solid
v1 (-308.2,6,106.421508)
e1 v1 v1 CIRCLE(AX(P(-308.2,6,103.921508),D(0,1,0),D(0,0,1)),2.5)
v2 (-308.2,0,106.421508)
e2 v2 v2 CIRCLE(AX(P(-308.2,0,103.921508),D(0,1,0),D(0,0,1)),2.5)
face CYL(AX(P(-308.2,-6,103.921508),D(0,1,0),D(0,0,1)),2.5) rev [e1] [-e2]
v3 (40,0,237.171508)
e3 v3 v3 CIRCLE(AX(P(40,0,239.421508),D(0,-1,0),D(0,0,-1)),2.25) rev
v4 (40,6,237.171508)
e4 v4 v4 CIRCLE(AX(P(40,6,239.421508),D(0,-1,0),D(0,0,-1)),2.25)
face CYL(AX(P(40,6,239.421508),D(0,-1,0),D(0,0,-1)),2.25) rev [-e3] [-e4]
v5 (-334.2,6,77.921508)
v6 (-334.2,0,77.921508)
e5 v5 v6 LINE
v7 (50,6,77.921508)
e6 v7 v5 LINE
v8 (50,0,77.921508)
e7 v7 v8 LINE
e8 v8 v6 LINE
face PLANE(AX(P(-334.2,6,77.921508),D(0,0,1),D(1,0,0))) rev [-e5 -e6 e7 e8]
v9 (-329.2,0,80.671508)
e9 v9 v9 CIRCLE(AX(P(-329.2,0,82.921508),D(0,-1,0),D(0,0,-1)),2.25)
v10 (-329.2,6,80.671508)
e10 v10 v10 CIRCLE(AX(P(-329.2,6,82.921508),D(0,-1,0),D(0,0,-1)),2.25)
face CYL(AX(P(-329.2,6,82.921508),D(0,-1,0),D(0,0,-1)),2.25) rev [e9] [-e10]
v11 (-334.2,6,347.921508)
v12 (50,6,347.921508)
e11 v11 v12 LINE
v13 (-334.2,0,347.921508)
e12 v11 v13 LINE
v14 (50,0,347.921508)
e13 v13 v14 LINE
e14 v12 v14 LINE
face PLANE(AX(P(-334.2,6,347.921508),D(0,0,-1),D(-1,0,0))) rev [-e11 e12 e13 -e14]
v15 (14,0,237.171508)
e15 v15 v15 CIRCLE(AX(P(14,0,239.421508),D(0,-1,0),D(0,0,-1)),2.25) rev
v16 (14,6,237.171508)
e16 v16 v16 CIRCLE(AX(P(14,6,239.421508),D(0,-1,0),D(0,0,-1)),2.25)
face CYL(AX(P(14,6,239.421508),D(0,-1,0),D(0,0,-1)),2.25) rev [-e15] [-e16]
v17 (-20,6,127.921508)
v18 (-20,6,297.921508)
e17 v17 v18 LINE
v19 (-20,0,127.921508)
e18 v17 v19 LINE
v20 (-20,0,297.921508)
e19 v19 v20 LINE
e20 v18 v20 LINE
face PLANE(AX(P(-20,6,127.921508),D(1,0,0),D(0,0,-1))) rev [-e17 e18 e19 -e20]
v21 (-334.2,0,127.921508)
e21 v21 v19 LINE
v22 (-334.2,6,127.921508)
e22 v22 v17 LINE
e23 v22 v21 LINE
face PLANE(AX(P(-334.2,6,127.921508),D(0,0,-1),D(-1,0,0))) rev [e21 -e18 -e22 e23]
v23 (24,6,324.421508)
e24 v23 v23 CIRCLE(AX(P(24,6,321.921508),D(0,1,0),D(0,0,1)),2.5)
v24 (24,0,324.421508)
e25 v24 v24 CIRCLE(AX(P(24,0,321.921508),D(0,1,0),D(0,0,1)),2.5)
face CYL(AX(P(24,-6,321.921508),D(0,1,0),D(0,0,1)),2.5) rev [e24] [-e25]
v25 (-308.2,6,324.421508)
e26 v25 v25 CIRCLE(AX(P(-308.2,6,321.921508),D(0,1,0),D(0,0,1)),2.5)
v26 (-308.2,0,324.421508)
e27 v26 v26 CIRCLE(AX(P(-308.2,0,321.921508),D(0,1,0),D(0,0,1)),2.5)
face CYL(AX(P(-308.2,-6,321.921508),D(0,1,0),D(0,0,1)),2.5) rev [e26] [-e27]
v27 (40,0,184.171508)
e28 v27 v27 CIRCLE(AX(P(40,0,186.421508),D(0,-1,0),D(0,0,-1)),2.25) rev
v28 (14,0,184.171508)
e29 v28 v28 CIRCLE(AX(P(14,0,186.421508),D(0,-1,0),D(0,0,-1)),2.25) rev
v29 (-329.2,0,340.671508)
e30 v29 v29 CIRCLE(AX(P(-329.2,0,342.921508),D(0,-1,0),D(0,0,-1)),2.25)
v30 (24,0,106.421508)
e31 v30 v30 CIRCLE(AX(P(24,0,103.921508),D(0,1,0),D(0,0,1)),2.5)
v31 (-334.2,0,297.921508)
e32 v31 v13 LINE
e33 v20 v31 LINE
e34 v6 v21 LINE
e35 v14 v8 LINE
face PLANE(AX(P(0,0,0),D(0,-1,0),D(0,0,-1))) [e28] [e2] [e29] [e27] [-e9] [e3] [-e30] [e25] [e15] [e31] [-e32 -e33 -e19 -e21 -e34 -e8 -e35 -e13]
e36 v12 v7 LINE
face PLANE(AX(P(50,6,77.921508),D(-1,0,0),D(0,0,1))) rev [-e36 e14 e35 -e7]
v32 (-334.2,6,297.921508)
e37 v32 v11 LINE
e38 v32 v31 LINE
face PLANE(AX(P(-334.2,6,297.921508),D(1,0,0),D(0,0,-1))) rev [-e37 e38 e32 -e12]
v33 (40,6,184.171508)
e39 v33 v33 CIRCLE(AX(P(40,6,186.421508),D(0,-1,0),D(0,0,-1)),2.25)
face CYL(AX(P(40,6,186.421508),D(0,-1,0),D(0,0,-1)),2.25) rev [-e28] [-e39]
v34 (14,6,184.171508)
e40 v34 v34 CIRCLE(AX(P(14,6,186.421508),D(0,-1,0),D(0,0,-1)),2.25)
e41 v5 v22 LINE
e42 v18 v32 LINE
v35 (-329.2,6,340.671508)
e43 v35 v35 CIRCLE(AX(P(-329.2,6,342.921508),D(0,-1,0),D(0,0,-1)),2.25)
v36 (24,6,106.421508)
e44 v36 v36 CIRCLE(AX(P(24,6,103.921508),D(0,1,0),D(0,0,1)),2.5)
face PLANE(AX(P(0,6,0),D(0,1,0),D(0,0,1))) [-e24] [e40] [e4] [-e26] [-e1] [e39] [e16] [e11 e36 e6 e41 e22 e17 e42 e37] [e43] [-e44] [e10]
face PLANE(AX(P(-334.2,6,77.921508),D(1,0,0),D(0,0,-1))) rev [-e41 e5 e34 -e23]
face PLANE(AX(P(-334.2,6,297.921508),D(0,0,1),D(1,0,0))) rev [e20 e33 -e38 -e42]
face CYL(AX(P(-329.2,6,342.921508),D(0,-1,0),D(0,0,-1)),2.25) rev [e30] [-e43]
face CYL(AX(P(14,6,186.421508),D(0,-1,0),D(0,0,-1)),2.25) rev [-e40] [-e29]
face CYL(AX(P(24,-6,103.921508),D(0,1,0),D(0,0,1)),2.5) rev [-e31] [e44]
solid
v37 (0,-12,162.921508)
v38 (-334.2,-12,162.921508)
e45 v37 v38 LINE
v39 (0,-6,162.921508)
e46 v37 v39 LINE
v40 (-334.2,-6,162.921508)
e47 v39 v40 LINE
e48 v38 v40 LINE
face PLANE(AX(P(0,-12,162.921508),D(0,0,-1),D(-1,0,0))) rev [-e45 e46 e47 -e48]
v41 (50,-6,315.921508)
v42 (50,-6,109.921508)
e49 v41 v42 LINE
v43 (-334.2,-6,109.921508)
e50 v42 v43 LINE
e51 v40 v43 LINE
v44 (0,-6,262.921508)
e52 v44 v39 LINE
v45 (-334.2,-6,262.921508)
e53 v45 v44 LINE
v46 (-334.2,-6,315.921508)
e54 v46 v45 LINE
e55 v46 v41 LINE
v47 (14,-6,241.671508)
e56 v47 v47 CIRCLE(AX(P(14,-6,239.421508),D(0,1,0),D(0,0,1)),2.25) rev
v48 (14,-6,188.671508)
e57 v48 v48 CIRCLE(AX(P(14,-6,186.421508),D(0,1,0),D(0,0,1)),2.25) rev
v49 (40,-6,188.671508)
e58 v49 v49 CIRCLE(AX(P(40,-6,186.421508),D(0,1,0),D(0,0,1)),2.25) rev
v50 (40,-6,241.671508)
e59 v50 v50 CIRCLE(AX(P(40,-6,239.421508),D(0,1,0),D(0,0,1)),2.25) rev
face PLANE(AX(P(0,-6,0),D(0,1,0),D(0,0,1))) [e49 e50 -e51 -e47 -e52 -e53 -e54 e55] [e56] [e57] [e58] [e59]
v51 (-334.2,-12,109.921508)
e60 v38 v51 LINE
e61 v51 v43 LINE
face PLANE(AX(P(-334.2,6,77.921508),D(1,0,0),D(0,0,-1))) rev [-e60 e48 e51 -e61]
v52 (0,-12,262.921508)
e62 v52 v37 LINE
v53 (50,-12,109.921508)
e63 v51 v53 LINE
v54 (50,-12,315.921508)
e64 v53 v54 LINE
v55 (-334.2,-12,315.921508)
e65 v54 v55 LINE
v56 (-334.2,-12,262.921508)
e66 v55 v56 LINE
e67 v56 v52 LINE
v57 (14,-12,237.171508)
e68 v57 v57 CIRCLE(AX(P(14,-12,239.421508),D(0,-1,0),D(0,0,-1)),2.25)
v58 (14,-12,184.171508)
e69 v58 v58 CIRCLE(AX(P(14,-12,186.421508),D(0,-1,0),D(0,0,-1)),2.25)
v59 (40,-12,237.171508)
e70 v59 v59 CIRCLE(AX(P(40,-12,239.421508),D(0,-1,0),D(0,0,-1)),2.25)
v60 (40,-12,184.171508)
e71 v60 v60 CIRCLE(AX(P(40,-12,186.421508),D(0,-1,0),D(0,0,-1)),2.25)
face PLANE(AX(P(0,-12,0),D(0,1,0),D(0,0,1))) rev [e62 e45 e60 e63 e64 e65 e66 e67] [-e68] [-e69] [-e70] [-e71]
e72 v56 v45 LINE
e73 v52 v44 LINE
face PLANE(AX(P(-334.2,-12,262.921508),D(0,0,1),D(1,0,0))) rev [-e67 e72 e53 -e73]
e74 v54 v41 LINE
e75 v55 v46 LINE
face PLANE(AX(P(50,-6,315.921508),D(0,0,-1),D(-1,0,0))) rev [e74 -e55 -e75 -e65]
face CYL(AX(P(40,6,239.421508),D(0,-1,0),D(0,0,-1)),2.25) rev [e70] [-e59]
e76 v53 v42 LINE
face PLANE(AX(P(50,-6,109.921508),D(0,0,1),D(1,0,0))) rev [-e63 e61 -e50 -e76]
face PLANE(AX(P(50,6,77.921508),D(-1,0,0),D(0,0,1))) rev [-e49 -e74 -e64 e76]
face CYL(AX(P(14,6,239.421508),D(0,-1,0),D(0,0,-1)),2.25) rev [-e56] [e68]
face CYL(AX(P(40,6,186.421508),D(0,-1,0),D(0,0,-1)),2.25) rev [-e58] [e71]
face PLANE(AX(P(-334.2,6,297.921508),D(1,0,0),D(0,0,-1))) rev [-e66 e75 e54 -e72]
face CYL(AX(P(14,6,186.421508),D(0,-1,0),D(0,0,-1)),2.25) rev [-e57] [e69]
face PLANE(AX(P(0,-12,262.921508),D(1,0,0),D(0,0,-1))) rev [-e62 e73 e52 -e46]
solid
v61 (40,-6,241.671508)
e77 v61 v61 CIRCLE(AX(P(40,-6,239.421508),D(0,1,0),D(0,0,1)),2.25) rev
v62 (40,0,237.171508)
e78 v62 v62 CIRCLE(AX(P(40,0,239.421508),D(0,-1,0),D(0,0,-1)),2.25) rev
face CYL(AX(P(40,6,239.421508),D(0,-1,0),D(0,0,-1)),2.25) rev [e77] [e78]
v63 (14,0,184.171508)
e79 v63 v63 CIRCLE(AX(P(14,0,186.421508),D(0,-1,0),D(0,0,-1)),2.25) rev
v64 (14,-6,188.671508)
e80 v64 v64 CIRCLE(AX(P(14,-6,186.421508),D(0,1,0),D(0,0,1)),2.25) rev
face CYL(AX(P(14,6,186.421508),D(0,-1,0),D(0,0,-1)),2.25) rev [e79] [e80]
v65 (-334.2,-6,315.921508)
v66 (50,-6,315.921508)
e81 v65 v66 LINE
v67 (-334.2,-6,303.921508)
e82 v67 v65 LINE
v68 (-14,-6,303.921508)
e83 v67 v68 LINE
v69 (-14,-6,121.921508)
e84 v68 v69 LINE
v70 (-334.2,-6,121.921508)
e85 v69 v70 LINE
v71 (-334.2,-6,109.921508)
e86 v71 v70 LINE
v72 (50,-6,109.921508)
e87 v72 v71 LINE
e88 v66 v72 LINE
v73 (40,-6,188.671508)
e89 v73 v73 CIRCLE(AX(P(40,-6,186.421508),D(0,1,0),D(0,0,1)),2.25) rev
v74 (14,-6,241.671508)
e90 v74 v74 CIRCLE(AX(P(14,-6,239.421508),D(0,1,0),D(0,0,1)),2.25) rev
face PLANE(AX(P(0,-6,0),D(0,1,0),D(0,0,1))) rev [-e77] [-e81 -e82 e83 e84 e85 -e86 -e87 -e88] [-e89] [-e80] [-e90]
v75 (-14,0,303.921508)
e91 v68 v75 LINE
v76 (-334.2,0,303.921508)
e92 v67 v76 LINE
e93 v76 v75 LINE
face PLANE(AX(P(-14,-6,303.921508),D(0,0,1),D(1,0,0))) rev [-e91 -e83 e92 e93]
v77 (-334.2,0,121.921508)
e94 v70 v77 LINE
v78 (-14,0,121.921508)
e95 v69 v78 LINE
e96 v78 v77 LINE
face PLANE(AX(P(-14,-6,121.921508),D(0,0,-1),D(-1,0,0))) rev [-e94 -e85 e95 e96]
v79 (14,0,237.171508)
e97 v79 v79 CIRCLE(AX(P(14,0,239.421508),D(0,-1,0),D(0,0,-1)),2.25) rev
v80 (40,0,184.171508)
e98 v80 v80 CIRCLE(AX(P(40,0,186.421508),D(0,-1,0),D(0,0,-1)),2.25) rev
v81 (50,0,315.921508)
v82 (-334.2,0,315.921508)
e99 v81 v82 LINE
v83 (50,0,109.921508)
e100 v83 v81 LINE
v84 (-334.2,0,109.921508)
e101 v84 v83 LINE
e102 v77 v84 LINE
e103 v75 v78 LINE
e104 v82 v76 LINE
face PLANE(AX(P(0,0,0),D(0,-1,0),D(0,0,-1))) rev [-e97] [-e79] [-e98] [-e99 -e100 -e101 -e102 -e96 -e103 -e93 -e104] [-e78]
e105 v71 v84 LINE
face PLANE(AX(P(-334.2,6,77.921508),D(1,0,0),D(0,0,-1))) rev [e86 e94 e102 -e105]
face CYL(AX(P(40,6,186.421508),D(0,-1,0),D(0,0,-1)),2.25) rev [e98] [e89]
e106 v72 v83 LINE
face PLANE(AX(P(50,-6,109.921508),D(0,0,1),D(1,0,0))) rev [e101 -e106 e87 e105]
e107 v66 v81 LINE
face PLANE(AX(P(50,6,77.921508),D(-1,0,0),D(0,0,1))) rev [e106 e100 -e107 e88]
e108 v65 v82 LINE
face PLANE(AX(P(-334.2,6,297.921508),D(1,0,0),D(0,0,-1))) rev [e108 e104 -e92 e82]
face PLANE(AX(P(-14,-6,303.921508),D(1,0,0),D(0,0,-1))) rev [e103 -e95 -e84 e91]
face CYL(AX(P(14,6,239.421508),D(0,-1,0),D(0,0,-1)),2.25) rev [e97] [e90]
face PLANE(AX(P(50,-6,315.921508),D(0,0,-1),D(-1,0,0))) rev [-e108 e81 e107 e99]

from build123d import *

# Parameters (mm, degrees)
EXTRUDE_2_DEPTH             = 6
EXTRUDE_3_DEPTH             = 6
SKETCH_4_R                  = 2.5
CUT_EXTRUDE_1_DEPTH         = 483.579543495
PATTERN_LINEAR_2_COUNT      = 2
PATTERN_LINEAR_2_PITCH      = 332.2
PATTERN_LINEAR_2_COUNT_DIR2 = 2
PATTERN_LINEAR_2_PITCH_DIR2 = 218
EXTRUDE_4_DEPTH             = 6
SKETCH_6_R                  = 2.25
CUT_EXTRUDE_2_DEPTH         = 483.766005224
SKETCH_7_R                  = 2.25
CUT_EXTRUDE_3_DEPTH         = 483.579543495
SPLIT_START                 = -12
SPLIT_BODIES_1_OUTLINE_R    = 2.25
SPLIT_BODIES_1_DEPTH        = 12
SPLIT_START_2               = -6
SPLIT_BODIES_1_2_OUTLINE_R  = 2.25
SPLIT_BODIES_1_2_DEPTH      = 6
SPLIT_BODIES_1_3_OUTLINE_R  = 2.25
SPLIT_BODIES_1_3_DEPTH      = 6


# Read off the part's stored shape, not the designer's step: Разделить1
with BuildPart() as part:
    # Эскиз1 → Бобышка-Вытянуть2 (new body)
    with BuildSketch(Plane(origin=(0, 0, 0), x_dir=(1, 0, 0), z_dir=(0, 1, 0))):
        Polygon((50, -77.921508101), (50, -347.921508101), (-334.2, -347.921508101), (-334.2, -297.921508101), (-20, -297.921508101), (-20, -127.921508101), (-334.2, -127.921508101), (-334.2, -77.921508101), align=None)
    extrude(amount=EXTRUDE_2_DEPTH)

    # Эскиз2 → Бобышка-Вытянуть3 (add)
    with BuildSketch(Plane.XZ):
        Polygon((50, 315.921508101), (50, 109.921508101), (-334.2, 109.921508101), (-334.2, 121.921508101), (-14, 121.921508101), (-14, 303.921508101), (-334.2, 303.921508101), (-334.2, 315.921508101), align=None)
    extrude(amount=EXTRUDE_3_DEPTH)

    # Эскиз4 → Вырез-Вытянуть1 (cut, through all)
    with BuildSketch(Plane(origin=(0, 6, 0), x_dir=(1, 0, 0), z_dir=(0, 1, 0))):
        with Locations(Location((-308.2, -103.921508101, 0), (0, 0, 270))):
            Circle(SKETCH_4_R)
    cut_extrude_1 = extrude(amount=-CUT_EXTRUDE_1_DEPTH, mode=Mode.SUBTRACT)

    # Линейный массив2: Cut-Extrude 1 2 × 2
    with Locations(*[(i * PATTERN_LINEAR_2_PITCH, 0, j * PATTERN_LINEAR_2_PITCH_DIR2) for i in range(PATTERN_LINEAR_2_COUNT) for j in range(PATTERN_LINEAR_2_COUNT_DIR2) if (i, j) != (0, 0)]):
        add(cut_extrude_1, mode=Mode.SUBTRACT)

    # Эскиз5 → Бобышка-Вытянуть4 (add)
    with BuildSketch(Plane.XZ.offset(6)):
        Polygon((50, 315.921508101), (-334.2, 315.921508101), (-334.2, 262.921508101), (0, 262.921508101), (0, 162.921508101), (-334.2, 162.921508101), (-334.2, 109.921508101), (50, 109.921508101), align=None)
    extrude(amount=EXTRUDE_4_DEPTH)

    # Эскиз6 → Вырез-Вытянуть2 (cut, through all)
    with BuildSketch(Plane.XZ.offset(12)):
        with Locations(Location((14, 239.421508101, 0), (0, 0, 270))):
            Circle(SKETCH_6_R)
        with Locations(Location((40, 239.421508101, 0), (0, 0, 270))):
            Circle(SKETCH_6_R)
        with Locations(Location((40, 186.421508101, 0), (0, 0, 270))):
            Circle(SKETCH_6_R)
        with Locations(Location((14, 186.421508101, 0), (0, 0, 270))):
            Circle(SKETCH_6_R)
    extrude(amount=-CUT_EXTRUDE_2_DEPTH, mode=Mode.SUBTRACT)

    # Эскиз7 → Вырез-Вытянуть3 (cut, through all)
    with BuildSketch(Plane.XZ):
        with Locations(Location((-329.2, 342.921508101, 0), (0, 0, 270))):
            Circle(SKETCH_7_R)
        with Locations(Location((-329.2, 82.921508101, 0), (0, 0, 270))):
            Circle(SKETCH_7_R)
    extrude(amount=-CUT_EXTRUDE_3_DEPTH, mode=Mode.SUBTRACT)

    # Split Bodies 1 outline → Split Bodies 1 (cut)
    with BuildSketch(Plane(origin=(0, 0, 0), x_dir=(1, 0, 0), z_dir=(0, 1, 0)).offset(SPLIT_START)):
        Polygon((-334.2, -162.921508101), (-14, -162.921508101), (-14, -262.921508101), (-334.2, -262.921508101), (-334.2, -315.921508101), (50, -315.921508101), (50, -109.921508101), (-334.2, -109.921508101), align=None)
        with Locations((14, -186.421508101)):
            Circle(SPLIT_BODIES_1_OUTLINE_R, mode=Mode.SUBTRACT)
        with Locations((40, -186.421508101)):
            Circle(SPLIT_BODIES_1_OUTLINE_R, mode=Mode.SUBTRACT)
        with Locations((14, -239.421508101)):
            Circle(SPLIT_BODIES_1_OUTLINE_R, mode=Mode.SUBTRACT)
        with Locations((40, -239.421508101)):
            Circle(SPLIT_BODIES_1_OUTLINE_R, mode=Mode.SUBTRACT)
    extrude(amount=SPLIT_BODIES_1_DEPTH, mode=Mode.SUBTRACT)


with BuildPart() as body_2:
    # Split Bodies 1 2 outline → Split Bodies 1 2 (new body)
    with BuildSketch(Plane(origin=(0, 0, 0), x_dir=(1, 0, 0), z_dir=(0, 1, 0)).offset(SPLIT_START_2)):
        Polygon((-334.2, -303.921508101), (-334.2, -315.921508101), (50, -315.921508101), (50, -109.921508101), (-334.2, -109.921508101), (-334.2, -121.921508101), (-14, -121.921508101), (-14, -303.921508101), align=None)
        with Locations((14, -239.421508101)):
            Circle(SPLIT_BODIES_1_2_OUTLINE_R, mode=Mode.SUBTRACT)
        with Locations((40, -239.421508101)):
            Circle(SPLIT_BODIES_1_2_OUTLINE_R, mode=Mode.SUBTRACT)
        with Locations((14, -186.421508101)):
            Circle(SPLIT_BODIES_1_2_OUTLINE_R, mode=Mode.SUBTRACT)
        with Locations((40, -186.421508101)):
            Circle(SPLIT_BODIES_1_2_OUTLINE_R, mode=Mode.SUBTRACT)
    extrude(amount=SPLIT_BODIES_1_2_DEPTH)


with BuildPart() as body_3:
    # Split Bodies 1 3 outline → Split Bodies 1 3 (new body)
    with BuildSketch(Plane(origin=(0, 0, 0), x_dir=(1, 0, 0), z_dir=(0, 1, 0)).offset(SPLIT_START)):
        Polygon((50, -315.921508101), (50, -109.921508101), (-334.2, -109.921508101), (-334.2, -162.921508101), (0, -162.921508101), (0, -262.921508101), (-334.2, -262.921508101), (-334.2, -315.921508101), align=None)
        with Locations((14, -239.421508101)):
            Circle(SPLIT_BODIES_1_3_OUTLINE_R, mode=Mode.SUBTRACT)
        with Locations((40, -239.421508101)):
            Circle(SPLIT_BODIES_1_3_OUTLINE_R, mode=Mode.SUBTRACT)
        with Locations((14, -186.421508101)):
            Circle(SPLIT_BODIES_1_3_OUTLINE_R, mode=Mode.SUBTRACT)
        with Locations((40, -186.421508101)):
            Circle(SPLIT_BODIES_1_3_OUTLINE_R, mode=Mode.SUBTRACT)
    extrude(amount=SPLIT_BODIES_1_3_DEPTH)


solid = Compound([part.part, body_2.part, body_3.part])
